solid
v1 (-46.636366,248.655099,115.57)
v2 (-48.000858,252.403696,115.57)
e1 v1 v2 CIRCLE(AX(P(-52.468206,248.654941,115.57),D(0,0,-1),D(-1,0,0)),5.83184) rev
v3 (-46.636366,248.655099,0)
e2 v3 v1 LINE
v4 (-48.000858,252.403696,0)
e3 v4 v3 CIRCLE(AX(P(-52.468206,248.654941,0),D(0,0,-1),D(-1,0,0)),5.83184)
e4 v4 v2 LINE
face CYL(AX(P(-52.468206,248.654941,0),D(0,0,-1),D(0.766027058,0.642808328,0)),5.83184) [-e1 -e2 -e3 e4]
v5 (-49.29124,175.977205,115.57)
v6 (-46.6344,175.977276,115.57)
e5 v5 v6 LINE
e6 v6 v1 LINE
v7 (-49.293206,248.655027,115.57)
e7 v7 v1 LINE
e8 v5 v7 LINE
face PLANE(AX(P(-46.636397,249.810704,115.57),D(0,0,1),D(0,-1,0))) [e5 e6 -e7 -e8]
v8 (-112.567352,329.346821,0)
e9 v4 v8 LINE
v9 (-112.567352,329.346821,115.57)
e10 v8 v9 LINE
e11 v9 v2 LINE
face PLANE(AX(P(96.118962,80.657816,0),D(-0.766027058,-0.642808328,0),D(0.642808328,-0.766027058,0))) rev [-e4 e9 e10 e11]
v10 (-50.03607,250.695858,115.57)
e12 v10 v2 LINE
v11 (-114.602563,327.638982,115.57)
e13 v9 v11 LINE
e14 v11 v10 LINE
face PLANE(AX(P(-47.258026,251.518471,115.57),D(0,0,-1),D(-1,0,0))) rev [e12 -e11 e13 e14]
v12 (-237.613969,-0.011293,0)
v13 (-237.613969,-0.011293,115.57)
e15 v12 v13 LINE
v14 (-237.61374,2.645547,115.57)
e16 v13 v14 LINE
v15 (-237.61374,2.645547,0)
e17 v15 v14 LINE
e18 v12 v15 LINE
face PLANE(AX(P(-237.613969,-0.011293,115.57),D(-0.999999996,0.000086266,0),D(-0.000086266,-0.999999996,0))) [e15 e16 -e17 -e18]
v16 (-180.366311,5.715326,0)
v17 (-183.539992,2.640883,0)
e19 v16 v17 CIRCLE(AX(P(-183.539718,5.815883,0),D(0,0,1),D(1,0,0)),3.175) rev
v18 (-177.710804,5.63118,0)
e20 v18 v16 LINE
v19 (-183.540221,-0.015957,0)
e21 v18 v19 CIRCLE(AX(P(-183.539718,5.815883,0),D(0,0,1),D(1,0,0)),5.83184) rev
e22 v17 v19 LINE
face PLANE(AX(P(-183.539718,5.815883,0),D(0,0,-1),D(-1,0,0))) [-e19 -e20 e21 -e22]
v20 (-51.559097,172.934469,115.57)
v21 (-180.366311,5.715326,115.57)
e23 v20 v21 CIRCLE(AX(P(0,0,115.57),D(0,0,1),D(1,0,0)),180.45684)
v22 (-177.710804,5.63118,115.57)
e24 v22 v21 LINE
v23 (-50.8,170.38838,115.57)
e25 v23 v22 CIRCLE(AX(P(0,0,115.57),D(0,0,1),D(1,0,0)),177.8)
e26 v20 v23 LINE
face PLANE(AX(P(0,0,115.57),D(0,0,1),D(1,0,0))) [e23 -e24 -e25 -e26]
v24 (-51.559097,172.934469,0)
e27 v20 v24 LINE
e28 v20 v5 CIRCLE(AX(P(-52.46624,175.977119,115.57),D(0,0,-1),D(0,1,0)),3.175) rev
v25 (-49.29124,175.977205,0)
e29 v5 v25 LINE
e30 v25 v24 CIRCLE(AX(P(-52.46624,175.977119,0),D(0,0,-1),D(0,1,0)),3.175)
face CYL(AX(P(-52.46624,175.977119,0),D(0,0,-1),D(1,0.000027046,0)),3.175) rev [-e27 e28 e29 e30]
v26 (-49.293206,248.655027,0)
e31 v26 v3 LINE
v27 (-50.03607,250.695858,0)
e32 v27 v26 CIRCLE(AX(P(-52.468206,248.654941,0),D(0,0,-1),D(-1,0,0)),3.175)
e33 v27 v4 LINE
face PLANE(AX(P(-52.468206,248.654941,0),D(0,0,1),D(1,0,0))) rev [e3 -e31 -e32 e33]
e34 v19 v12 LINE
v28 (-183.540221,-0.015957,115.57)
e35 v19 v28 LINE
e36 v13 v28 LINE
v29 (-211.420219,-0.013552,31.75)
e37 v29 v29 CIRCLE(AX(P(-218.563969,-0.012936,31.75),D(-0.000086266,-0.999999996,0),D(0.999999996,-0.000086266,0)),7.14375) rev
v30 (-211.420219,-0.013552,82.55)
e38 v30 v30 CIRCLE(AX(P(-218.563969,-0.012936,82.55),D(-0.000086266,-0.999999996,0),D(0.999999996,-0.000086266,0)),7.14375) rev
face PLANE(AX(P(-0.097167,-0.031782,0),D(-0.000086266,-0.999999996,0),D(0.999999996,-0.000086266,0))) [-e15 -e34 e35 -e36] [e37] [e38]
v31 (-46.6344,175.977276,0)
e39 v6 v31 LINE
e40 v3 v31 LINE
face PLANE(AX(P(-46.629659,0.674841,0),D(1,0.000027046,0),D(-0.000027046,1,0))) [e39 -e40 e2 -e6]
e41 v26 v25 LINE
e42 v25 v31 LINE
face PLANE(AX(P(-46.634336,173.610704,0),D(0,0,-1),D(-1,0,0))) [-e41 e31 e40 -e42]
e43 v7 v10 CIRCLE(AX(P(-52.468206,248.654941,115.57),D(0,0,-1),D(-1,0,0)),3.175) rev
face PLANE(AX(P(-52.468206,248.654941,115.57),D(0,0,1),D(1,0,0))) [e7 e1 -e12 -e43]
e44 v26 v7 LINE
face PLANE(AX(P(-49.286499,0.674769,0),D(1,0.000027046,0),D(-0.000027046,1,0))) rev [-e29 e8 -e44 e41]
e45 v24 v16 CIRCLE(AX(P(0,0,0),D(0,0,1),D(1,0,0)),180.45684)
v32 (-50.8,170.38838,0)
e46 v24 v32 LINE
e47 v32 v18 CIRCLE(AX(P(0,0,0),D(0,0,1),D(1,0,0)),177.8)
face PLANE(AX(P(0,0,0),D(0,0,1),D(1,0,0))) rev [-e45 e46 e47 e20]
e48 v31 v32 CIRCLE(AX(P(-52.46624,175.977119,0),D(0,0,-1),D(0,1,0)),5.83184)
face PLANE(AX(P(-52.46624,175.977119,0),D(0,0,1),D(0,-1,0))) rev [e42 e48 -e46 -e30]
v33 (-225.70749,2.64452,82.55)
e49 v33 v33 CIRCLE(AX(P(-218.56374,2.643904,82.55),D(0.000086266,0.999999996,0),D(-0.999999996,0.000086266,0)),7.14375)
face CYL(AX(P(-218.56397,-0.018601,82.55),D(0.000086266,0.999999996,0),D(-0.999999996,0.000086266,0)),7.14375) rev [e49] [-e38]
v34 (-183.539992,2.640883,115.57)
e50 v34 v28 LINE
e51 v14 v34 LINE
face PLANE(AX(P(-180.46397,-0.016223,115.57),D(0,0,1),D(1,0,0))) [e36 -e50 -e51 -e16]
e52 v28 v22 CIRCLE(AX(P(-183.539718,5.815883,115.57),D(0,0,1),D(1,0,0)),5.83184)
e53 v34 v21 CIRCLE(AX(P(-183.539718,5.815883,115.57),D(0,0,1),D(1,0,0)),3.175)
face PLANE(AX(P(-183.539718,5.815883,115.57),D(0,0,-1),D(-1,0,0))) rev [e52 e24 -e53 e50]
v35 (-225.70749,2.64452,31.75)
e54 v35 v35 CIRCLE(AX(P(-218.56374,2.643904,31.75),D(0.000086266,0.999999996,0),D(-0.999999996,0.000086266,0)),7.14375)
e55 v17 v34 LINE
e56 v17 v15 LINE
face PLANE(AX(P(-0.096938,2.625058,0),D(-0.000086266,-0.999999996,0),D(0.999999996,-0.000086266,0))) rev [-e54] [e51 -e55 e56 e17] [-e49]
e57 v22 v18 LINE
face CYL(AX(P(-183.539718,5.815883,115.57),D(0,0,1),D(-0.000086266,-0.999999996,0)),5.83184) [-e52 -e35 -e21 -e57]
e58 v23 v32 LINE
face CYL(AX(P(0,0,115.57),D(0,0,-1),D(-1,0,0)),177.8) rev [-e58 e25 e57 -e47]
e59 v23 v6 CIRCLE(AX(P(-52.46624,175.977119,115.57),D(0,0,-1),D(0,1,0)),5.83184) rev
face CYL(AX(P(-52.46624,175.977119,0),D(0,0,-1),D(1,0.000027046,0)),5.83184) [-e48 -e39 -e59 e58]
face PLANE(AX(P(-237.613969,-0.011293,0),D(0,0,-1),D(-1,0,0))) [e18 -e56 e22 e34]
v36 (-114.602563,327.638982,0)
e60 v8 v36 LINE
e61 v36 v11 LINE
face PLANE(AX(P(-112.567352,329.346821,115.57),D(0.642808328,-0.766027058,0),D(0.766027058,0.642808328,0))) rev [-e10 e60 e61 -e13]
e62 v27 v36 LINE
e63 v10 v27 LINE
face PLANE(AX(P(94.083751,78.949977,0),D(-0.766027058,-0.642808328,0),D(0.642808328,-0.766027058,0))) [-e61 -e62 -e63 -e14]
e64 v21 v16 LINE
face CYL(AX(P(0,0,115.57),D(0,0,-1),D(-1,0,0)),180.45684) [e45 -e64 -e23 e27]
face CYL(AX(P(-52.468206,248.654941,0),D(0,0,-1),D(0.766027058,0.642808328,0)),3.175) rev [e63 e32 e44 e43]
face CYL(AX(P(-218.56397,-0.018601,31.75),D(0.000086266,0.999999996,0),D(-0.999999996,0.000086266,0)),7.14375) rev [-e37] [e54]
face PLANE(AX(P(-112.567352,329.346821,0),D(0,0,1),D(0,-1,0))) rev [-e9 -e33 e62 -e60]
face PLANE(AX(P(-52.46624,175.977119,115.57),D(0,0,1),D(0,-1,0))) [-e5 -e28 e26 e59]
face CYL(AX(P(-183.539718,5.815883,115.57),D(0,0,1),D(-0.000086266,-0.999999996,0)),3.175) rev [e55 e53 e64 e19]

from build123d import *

# Parameters (mm, degrees)
BASE_FLANGE1_DEPTH           = 115.57
EDGE_FLANGE1_DEPTH           = 115.57
EDGE_FLANGE2_STRIP_CUT_DEPTH = 115.57
EDGE_FLANGE2_DEPTH           = 115.57
EDGE_FLANGE3_DEPTH           = 115.57
SKETCH20_R                   = 7.14375
CUT_EXTRUDE1_DEPTH           = 2.65684


# Sheet-metal steps are written as plain solids
with BuildPart() as part:
    # Sketch1 → Base-Flange1 (new body)
    with BuildSketch(Plane.XY):
        with BuildLine():
            ThreePointArc((-50.8, 170.388379885), (-140.856418383, 108.500273734), (-177.710803869, 5.63118))
            Line((-177.710803869, 5.63118), (-180.366311024, 5.715325918))
            ThreePointArc((-180.366311024, 5.715325918), (-142.961215721, 110.121577824), (-51.559097143, 172.934469105))
            Line((-51.559097143, 172.934469105), (-50.8, 170.388379885))
        make_face()
    extrude(amount=BASE_FLANGE1_DEPTH)

    # Edge-Flange1 section (across the edge) → Edge-Flange1 (add)
    with BuildSketch(Plane(origin=(-49.291175996, 173.610632552, 115.57), x_dir=(-0.9999999996342678, -2.7045604981235094e-05, 0), z_dir=(0, 0, -1))):
        with BuildLine():
            Line((-2.65684, 2.366572064), (-2.65684, 76.2))
            Line((-2.65684, 76.2), (0, 76.2))
            Line((0, 76.2), (0, 2.366572064))
            ThreePointArc((0, 2.366572064), (0.62936233, 0.469112223), (2.267939433, -0.676102109))
            Line((2.267939433, -0.676102109), (1.508911151, -3.222211858))
            ThreePointArc((1.508911151, -3.222211858), (-1.500827273, -1.118682173), (-2.65684, 2.366572064))
        make_face()
    extrude(amount=EDGE_FLANGE1_DEPTH)

    # Edge-Flange2 strip (across the edge) → Edge-Flange2 strip cut (cut)
    with BuildSketch(Plane(origin=(-49.293236871, 249.810632524, 115.57), x_dir=(-0.766027058259036, -0.6428083275868535, 0), z_dir=(0, 0, -1))):
        Polygon((-12.205285278, 10.412383287), (-1.292448625, -2.593029), (0.742808893, -0.885245167), (-10.17002776, 12.12016712), align=None)
    extrude(amount=EDGE_FLANGE2_STRIP_CUT_DEPTH, mode=Mode.SUBTRACT)

    # Edge-Flange2 section (across the edge) → Edge-Flange2 (add)
    with BuildSketch(Plane(origin=(-49.293236871, 249.810632524, 115.57), x_dir=(-0.766027058259036, -0.6428083275868535, 0), z_dir=(0, 0, -1))):
        with BuildLine():
            Line((-2.65684, 1.155605494), (-2.65684, 101.6))
            Line((-2.65684, 101.6), (0, 101.6))
            Line((0, 101.6), (0, 1.155605494))
            ThreePointArc((0, 1.155605494), (0.191475929, 0.069691539), (0.742808893, -0.885245167))
            Line((0.742808893, -0.885245167), (-1.292448625, -2.593029))
            ThreePointArc((-1.292448625, -2.593029), (-2.305137014, -0.839001259), (-2.65684, 1.155605494))
        make_face()
    extrude(amount=EDGE_FLANGE2_DEPTH)

    # Edge-Flange3 section (across the edge) → Edge-Flange3 (add)
    with BuildSketch(Plane(origin=(-180.463740314, 2.640617339, 0), x_dir=(8.626632785422443e-05, 0.9999999962790604, 0), z_dir=(0, 0, 1))):
        with BuildLine():
            Line((-2.65684, 3.076251829), (-2.65684, 57.15))
            Line((-2.65684, 57.15), (0, 57.15))
            Line((0, 57.15), (0, 3.076251829))
            ThreePointArc((0, 3.076251829), (0.894756196, 0.86692768), (3.074716973, -0.097164046))
            Line((3.074716973, -0.097164046), (2.990800136, -2.75267845))
            ThreePointArc((2.990800136, -2.75267845), (-1.013351819, -0.981834768), (-2.65684, 3.076251829))
        make_face()
    extrude(amount=EDGE_FLANGE3_DEPTH)

    # Sketch20 → Cut-Extrude1 (cut)
    with BuildSketch(Plane(origin=(0.000226453, 2.625049375, 0), x_dir=(0.9999999962790604, -8.626632785420363e-05, 0), z_dir=(8.626632785420363e-05, 0.9999999962790604, 0))):
        with Locations(Location((-218.563967439, -31.75, 0), (0, 0, 180))):
            Circle(SKETCH20_R)
        with Locations(Location((-218.563967439, -82.55, 0), (0, 0, 180))):
            Circle(SKETCH20_R)
    extrude(amount=-CUT_EXTRUDE1_DEPTH, mode=Mode.SUBTRACT)


solid = part.part
